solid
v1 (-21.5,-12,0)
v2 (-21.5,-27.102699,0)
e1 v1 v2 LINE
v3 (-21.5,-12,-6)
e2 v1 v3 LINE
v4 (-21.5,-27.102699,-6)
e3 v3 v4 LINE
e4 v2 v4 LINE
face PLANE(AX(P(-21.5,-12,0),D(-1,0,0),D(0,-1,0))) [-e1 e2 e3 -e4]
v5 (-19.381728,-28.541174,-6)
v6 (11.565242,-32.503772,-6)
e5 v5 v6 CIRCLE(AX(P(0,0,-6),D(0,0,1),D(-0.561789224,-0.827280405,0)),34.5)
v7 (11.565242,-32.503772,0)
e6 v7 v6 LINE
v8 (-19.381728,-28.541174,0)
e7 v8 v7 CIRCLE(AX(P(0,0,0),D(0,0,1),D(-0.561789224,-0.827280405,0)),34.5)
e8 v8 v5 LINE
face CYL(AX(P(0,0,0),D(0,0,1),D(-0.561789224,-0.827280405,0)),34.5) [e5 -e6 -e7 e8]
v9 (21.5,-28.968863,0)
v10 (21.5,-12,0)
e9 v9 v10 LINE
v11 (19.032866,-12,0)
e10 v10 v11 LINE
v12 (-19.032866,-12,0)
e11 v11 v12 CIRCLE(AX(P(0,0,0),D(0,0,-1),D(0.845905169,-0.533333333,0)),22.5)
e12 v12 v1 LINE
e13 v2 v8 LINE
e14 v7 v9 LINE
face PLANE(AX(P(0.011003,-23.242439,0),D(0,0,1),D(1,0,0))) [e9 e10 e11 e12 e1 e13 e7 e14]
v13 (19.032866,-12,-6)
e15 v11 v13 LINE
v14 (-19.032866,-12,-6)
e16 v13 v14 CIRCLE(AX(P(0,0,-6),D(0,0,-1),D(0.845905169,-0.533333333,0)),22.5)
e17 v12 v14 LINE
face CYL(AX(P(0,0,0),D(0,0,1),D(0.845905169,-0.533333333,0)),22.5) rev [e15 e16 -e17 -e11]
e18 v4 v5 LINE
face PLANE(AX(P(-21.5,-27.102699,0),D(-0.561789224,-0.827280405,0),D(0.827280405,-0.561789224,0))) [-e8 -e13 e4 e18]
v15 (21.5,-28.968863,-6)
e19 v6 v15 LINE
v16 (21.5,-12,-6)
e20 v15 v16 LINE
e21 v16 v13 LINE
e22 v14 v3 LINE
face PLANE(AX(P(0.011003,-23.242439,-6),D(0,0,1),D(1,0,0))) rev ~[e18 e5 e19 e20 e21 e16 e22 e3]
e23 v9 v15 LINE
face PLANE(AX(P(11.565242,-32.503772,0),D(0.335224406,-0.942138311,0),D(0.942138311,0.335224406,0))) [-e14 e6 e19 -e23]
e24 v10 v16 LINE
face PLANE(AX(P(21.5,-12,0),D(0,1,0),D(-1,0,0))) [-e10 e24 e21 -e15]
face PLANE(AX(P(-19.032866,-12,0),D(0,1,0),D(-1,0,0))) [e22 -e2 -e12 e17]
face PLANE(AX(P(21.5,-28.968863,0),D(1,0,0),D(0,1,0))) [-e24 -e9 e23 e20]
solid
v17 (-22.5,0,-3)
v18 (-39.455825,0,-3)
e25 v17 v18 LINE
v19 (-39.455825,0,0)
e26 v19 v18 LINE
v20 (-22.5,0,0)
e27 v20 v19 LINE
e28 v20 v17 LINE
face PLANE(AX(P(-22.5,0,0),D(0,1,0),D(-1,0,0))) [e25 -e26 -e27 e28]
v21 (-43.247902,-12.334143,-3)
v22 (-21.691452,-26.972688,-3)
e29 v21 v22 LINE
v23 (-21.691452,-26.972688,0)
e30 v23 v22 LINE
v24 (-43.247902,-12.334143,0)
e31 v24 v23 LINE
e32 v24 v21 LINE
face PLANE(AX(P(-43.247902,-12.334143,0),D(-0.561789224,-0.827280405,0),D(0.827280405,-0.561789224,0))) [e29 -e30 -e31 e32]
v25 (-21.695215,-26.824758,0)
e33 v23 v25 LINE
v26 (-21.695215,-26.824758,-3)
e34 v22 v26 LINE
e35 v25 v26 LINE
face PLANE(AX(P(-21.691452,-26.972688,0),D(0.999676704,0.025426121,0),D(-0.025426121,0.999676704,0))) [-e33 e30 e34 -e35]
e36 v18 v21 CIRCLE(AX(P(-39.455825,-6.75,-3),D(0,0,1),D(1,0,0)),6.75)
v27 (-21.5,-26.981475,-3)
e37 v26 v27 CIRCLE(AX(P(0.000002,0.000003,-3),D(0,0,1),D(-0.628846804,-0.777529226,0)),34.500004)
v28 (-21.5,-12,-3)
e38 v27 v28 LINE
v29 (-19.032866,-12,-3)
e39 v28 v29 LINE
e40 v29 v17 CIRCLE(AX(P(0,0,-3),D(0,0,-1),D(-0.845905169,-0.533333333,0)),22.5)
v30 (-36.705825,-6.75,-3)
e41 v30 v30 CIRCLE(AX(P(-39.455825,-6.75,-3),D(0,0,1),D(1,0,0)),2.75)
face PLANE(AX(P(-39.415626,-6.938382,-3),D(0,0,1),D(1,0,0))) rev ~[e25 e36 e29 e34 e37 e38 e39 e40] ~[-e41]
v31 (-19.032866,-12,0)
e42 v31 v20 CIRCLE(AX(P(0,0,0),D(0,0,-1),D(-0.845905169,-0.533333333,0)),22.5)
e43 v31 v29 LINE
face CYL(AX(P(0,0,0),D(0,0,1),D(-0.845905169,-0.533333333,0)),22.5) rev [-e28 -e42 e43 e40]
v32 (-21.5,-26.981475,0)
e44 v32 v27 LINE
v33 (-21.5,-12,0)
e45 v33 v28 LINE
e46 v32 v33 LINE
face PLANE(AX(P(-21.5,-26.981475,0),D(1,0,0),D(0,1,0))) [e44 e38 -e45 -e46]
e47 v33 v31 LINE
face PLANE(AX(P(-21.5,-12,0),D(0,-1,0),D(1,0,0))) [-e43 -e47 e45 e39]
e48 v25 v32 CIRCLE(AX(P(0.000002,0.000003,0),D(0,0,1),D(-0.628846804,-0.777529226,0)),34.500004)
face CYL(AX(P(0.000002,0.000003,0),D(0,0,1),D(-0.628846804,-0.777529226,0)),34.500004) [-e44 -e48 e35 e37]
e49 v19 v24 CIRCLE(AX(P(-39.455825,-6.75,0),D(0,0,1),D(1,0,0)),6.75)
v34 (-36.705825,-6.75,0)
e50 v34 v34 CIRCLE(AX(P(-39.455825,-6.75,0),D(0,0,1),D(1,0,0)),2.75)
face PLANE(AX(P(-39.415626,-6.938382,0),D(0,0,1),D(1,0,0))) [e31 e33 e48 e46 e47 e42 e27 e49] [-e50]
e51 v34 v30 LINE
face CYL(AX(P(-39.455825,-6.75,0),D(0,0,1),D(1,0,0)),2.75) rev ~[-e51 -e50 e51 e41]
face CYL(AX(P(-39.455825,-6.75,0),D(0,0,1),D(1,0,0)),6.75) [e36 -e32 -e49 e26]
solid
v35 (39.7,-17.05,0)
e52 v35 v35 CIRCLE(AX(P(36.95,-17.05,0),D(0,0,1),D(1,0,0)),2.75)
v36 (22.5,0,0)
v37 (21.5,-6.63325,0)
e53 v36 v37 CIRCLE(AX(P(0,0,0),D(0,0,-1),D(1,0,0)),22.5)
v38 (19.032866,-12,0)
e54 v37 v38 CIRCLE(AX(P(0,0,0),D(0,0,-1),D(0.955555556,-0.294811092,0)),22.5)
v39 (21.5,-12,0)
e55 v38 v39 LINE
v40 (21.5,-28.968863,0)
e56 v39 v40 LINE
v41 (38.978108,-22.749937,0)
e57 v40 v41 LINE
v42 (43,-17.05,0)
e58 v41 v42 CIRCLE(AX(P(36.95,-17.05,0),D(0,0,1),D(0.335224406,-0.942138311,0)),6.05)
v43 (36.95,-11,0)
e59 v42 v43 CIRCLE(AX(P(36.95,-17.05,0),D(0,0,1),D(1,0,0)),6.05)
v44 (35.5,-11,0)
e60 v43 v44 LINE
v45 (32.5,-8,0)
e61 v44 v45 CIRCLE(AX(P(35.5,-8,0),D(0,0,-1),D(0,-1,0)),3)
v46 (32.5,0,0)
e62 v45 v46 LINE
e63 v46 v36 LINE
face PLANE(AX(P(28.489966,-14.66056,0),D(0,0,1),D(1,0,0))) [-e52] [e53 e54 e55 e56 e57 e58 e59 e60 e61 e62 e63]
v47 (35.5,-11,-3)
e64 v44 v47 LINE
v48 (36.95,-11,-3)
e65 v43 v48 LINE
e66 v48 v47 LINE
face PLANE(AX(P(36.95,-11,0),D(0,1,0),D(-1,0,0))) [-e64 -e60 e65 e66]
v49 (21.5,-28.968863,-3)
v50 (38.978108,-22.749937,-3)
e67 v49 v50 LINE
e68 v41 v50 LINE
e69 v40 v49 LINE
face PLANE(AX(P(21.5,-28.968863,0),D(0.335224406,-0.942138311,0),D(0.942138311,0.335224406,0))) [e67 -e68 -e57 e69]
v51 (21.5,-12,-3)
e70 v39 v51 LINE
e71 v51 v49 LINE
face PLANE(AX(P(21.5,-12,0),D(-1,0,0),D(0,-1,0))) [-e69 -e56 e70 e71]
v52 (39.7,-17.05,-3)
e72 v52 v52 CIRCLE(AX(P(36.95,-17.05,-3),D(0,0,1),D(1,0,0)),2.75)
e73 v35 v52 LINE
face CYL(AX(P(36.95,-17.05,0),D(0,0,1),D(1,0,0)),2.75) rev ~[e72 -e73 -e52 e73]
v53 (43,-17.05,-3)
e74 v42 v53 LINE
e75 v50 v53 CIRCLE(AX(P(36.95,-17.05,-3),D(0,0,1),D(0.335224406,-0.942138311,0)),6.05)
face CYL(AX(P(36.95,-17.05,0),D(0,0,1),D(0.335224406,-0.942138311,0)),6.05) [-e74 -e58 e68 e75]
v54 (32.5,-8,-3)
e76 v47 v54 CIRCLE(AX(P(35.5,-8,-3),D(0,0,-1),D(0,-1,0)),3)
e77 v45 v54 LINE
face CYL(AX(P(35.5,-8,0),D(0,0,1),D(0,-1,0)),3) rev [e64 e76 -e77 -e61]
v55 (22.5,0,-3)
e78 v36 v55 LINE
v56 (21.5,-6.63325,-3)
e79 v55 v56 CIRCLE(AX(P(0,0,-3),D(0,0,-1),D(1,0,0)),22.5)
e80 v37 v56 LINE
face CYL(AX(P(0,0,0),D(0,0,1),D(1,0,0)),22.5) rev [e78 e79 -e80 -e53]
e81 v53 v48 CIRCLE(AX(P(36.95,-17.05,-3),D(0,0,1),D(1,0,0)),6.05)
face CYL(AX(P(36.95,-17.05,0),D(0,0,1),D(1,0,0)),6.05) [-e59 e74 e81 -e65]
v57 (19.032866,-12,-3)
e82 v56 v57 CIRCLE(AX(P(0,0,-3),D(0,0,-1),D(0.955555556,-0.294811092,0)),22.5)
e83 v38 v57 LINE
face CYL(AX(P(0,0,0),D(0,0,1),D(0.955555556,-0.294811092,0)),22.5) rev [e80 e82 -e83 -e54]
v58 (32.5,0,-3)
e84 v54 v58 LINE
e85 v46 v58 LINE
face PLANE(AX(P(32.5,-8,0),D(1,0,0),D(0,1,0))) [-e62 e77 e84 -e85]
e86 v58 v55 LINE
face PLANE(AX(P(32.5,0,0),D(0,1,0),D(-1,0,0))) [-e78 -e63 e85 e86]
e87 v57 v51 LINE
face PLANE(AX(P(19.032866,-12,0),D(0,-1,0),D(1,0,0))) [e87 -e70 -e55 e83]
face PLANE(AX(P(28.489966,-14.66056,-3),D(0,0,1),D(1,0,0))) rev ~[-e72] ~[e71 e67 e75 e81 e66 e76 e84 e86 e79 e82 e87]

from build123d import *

# Parameters (mm, degrees)
F0_R     = 2.75
F1_DEPTH = 3
F2_DEPTH = 6


# Not quite as in the source:
# - a feature names something its author has since deleted; it is built from what else it names


with BuildPart() as f1:
    # F0 (on Top) → F1 (new body)
    with BuildSketch(Plane.XY):
        with BuildLine():
            ThreePointArc((-33.2160406839, -9.3244110423), (-34.0059545463, -5.8176503326), (-34.4267003209, -2.2477333057))
            ThreePointArc((-34.4267003209, -2.2477333057), (-36.7015374081, -0.5875004995), (-39.4558249578, 0))
            ThreePointArc((-39.4558249578, 0), (-45.9077806089, -4.7663749659), (-43.2479022167, -12.334142733))
            ThreePointArc((-43.2479022167, -12.334142733), (-37.5161243055, -13.215296697), (-33.2160406839, -9.3244110423))
        make_face()
        with Locations((-39.4558249578, -6.75)):
            Circle(F0_R, mode=Mode.SUBTRACT)
        with BuildLine():
            ThreePointArc((-21.6952147359, -26.8247582946), (-28.8162633149, -18.9703180935), (-33.2160406839, -9.3244110423))
            ThreePointArc((-33.2160406839, -9.3244110423), (-37.5161243055, -13.215296697), (-43.2479022167, -12.334142733))
            Line((-43.2479022167, -12.334142733), (-21.6914522522, -26.9726875554))
            Line((-21.6914522522, -26.9726875554), (-21.6952147359, -26.8247582946))
        make_face()
        with BuildLine():
            ThreePointArc((-32.7058249578, -6.75), (-33.1507043682, -4.3400302179), (-34.4267003209, -2.2477333057))
            ThreePointArc((-34.4267003209, -2.2477333057), (-34.0059545463, -5.8176503326), (-33.2160406839, -9.3244110423))
            ThreePointArc((-33.2160406839, -9.3244110423), (-32.8346074018, -8.0622416224), (-32.7058249578, -6.75))
        make_face()
        with BuildLine():
            ThreePointArc((-34.4267003209, -2.2477333057), (-34.4816702109, -1.1244640786), (-34.5, 0))
            Line((-34.5, 0), (-39.4558249578, 0))
            ThreePointArc((-39.4558249578, 0), (-36.7015374081, -0.5875004995), (-34.4267003209, -2.2477333057))
        make_face()
        with BuildLine():
            ThreePointArc((-19.0328663107, -12), (-21.6158447902, -6.2454186413), (-22.5, 0))
            Line((-22.5, 0), (-34.5, 0))
            ThreePointArc((-34.5, 0), (-34.4816702109, -1.1244640786), (-34.4267003209, -2.2477333057))
            ThreePointArc((-34.4267003209, -2.2477333057), (-33.1507043682, -4.3400302179), (-32.7058249578, -6.75))
            ThreePointArc((-32.7058249578, -6.75), (-32.8346074018, -8.0622416224), (-33.2160406839, -9.3244110423))
            ThreePointArc((-33.2160406839, -9.3244110423), (-28.8162633149, -18.9703180935), (-21.6952147359, -26.8247582946))
            ThreePointArc((-21.6952147359, -26.8247582946), (-21.5977495138, -26.9032937749), (-21.5, -26.9814751265))
            Line((-21.5, -26.9814751265), (-21.5, -12))
            Line((-21.5, -12), (-19.0328663107, -12))
        make_face()
    extrude(amount=-F1_DEPTH)


with BuildPart() as f1b:
    # F0 (on Top) → F1, piece 2 (new body)
    with BuildSketch(Plane.XY):
        with BuildLine():
            ThreePointArc((22.5, 0), (22.2485954613, -3.3541019663), (21.5, -6.6332495807))
            Line((21.5, -6.6332495807), (21.5, -12))
            Line((21.5, -12), (21.5, -26.9814751265))
            Line((21.5, -26.9814751265), (21.5, -28.9688625831))
            Line((21.5, -28.9688625831), (38.9781076545, -22.749936784))
            ThreePointArc((38.9781076545, -22.749936784), (30.9881581058, -18.0790487007), (36.95, -11))
            Line((36.95, -11), (35.5, -11))
            ThreePointArc((35.5, -11), (33.3786796564, -10.1213203436), (32.5, -8))
            Line((32.5, -8), (32.5, 0))
            Line((32.5, 0), (22.5, 0))
        make_face()
        with BuildLine():
            ThreePointArc((36.95, -11), (30.9881581058, -18.0790487007), (38.9781076545, -22.749936784))
            ThreePointArc((38.9781076545, -22.749936784), (41.8933061462, -20.5380115174), (43, -17.05))
            ThreePointArc((43, -17.05), (41.2279960262, -12.7720039738), (36.95, -11))
        make_face()
        with Locations((36.95, -17.05)):
            Circle(F0_R, mode=Mode.SUBTRACT)
        with BuildLine():
            ThreePointArc((21.5, -6.6332495807), (20.4433073488, -9.3979351266), (19.0328663107, -12))
            Line((19.0328663107, -12), (21.5, -12))
            Line((21.5, -12), (21.5, -6.6332495807))
        make_face()
    extrude(amount=-F1_DEPTH)


with BuildPart() as f2:
    # F0 (on Top) → F2 (new body)
    with BuildSketch(Plane.XY):
        with BuildLine():
            ThreePointArc((19.0328663107, -12), (0, -22.5), (-19.0328663107, -12))
            Line((-19.0328663107, -12), (-21.5, -12))
            Line((-21.5, -12), (-21.5, -26.9814751265))
            ThreePointArc((-21.5, -26.9814751265), (-20.4557349054, -27.7815210073), (-19.3817282119, -28.5411739688))
            ThreePointArc((-19.3817282119, -28.5411739688), (-4.3817701298, -34.220609149), (11.5652419965, -32.5037717436))
            ThreePointArc((11.5652419965, -32.5037717436), (16.7616078302, -30.1545768159), (21.5, -26.9814751265))
            Line((21.5, -26.9814751265), (21.5, -12))
            Line((21.5, -12), (19.0328663107, -12))
        make_face()
        with BuildLine():
            ThreePointArc((-19.3817282119, -28.5411739688), (-20.4557349054, -27.7815210073), (-21.5, -26.9814751265))
            Line((-21.5, -26.9814751265), (-21.5, -27.102698869))
            Line((-21.5, -27.102698869), (-19.3817282119, -28.5411739688))
        make_face()
        with BuildLine():
            Line((21.5, -28.9688625831), (21.5, -26.9814751265))
            ThreePointArc((21.5, -26.9814751265), (16.7616078302, -30.1545768159), (11.5652419965, -32.5037717436))
            Line((11.5652419965, -32.5037717436), (21.5, -28.9688625831))
        make_face()
    extrude(amount=-F2_DEPTH)


solid = Compound([f1.part, f1b.part, f2.part])
